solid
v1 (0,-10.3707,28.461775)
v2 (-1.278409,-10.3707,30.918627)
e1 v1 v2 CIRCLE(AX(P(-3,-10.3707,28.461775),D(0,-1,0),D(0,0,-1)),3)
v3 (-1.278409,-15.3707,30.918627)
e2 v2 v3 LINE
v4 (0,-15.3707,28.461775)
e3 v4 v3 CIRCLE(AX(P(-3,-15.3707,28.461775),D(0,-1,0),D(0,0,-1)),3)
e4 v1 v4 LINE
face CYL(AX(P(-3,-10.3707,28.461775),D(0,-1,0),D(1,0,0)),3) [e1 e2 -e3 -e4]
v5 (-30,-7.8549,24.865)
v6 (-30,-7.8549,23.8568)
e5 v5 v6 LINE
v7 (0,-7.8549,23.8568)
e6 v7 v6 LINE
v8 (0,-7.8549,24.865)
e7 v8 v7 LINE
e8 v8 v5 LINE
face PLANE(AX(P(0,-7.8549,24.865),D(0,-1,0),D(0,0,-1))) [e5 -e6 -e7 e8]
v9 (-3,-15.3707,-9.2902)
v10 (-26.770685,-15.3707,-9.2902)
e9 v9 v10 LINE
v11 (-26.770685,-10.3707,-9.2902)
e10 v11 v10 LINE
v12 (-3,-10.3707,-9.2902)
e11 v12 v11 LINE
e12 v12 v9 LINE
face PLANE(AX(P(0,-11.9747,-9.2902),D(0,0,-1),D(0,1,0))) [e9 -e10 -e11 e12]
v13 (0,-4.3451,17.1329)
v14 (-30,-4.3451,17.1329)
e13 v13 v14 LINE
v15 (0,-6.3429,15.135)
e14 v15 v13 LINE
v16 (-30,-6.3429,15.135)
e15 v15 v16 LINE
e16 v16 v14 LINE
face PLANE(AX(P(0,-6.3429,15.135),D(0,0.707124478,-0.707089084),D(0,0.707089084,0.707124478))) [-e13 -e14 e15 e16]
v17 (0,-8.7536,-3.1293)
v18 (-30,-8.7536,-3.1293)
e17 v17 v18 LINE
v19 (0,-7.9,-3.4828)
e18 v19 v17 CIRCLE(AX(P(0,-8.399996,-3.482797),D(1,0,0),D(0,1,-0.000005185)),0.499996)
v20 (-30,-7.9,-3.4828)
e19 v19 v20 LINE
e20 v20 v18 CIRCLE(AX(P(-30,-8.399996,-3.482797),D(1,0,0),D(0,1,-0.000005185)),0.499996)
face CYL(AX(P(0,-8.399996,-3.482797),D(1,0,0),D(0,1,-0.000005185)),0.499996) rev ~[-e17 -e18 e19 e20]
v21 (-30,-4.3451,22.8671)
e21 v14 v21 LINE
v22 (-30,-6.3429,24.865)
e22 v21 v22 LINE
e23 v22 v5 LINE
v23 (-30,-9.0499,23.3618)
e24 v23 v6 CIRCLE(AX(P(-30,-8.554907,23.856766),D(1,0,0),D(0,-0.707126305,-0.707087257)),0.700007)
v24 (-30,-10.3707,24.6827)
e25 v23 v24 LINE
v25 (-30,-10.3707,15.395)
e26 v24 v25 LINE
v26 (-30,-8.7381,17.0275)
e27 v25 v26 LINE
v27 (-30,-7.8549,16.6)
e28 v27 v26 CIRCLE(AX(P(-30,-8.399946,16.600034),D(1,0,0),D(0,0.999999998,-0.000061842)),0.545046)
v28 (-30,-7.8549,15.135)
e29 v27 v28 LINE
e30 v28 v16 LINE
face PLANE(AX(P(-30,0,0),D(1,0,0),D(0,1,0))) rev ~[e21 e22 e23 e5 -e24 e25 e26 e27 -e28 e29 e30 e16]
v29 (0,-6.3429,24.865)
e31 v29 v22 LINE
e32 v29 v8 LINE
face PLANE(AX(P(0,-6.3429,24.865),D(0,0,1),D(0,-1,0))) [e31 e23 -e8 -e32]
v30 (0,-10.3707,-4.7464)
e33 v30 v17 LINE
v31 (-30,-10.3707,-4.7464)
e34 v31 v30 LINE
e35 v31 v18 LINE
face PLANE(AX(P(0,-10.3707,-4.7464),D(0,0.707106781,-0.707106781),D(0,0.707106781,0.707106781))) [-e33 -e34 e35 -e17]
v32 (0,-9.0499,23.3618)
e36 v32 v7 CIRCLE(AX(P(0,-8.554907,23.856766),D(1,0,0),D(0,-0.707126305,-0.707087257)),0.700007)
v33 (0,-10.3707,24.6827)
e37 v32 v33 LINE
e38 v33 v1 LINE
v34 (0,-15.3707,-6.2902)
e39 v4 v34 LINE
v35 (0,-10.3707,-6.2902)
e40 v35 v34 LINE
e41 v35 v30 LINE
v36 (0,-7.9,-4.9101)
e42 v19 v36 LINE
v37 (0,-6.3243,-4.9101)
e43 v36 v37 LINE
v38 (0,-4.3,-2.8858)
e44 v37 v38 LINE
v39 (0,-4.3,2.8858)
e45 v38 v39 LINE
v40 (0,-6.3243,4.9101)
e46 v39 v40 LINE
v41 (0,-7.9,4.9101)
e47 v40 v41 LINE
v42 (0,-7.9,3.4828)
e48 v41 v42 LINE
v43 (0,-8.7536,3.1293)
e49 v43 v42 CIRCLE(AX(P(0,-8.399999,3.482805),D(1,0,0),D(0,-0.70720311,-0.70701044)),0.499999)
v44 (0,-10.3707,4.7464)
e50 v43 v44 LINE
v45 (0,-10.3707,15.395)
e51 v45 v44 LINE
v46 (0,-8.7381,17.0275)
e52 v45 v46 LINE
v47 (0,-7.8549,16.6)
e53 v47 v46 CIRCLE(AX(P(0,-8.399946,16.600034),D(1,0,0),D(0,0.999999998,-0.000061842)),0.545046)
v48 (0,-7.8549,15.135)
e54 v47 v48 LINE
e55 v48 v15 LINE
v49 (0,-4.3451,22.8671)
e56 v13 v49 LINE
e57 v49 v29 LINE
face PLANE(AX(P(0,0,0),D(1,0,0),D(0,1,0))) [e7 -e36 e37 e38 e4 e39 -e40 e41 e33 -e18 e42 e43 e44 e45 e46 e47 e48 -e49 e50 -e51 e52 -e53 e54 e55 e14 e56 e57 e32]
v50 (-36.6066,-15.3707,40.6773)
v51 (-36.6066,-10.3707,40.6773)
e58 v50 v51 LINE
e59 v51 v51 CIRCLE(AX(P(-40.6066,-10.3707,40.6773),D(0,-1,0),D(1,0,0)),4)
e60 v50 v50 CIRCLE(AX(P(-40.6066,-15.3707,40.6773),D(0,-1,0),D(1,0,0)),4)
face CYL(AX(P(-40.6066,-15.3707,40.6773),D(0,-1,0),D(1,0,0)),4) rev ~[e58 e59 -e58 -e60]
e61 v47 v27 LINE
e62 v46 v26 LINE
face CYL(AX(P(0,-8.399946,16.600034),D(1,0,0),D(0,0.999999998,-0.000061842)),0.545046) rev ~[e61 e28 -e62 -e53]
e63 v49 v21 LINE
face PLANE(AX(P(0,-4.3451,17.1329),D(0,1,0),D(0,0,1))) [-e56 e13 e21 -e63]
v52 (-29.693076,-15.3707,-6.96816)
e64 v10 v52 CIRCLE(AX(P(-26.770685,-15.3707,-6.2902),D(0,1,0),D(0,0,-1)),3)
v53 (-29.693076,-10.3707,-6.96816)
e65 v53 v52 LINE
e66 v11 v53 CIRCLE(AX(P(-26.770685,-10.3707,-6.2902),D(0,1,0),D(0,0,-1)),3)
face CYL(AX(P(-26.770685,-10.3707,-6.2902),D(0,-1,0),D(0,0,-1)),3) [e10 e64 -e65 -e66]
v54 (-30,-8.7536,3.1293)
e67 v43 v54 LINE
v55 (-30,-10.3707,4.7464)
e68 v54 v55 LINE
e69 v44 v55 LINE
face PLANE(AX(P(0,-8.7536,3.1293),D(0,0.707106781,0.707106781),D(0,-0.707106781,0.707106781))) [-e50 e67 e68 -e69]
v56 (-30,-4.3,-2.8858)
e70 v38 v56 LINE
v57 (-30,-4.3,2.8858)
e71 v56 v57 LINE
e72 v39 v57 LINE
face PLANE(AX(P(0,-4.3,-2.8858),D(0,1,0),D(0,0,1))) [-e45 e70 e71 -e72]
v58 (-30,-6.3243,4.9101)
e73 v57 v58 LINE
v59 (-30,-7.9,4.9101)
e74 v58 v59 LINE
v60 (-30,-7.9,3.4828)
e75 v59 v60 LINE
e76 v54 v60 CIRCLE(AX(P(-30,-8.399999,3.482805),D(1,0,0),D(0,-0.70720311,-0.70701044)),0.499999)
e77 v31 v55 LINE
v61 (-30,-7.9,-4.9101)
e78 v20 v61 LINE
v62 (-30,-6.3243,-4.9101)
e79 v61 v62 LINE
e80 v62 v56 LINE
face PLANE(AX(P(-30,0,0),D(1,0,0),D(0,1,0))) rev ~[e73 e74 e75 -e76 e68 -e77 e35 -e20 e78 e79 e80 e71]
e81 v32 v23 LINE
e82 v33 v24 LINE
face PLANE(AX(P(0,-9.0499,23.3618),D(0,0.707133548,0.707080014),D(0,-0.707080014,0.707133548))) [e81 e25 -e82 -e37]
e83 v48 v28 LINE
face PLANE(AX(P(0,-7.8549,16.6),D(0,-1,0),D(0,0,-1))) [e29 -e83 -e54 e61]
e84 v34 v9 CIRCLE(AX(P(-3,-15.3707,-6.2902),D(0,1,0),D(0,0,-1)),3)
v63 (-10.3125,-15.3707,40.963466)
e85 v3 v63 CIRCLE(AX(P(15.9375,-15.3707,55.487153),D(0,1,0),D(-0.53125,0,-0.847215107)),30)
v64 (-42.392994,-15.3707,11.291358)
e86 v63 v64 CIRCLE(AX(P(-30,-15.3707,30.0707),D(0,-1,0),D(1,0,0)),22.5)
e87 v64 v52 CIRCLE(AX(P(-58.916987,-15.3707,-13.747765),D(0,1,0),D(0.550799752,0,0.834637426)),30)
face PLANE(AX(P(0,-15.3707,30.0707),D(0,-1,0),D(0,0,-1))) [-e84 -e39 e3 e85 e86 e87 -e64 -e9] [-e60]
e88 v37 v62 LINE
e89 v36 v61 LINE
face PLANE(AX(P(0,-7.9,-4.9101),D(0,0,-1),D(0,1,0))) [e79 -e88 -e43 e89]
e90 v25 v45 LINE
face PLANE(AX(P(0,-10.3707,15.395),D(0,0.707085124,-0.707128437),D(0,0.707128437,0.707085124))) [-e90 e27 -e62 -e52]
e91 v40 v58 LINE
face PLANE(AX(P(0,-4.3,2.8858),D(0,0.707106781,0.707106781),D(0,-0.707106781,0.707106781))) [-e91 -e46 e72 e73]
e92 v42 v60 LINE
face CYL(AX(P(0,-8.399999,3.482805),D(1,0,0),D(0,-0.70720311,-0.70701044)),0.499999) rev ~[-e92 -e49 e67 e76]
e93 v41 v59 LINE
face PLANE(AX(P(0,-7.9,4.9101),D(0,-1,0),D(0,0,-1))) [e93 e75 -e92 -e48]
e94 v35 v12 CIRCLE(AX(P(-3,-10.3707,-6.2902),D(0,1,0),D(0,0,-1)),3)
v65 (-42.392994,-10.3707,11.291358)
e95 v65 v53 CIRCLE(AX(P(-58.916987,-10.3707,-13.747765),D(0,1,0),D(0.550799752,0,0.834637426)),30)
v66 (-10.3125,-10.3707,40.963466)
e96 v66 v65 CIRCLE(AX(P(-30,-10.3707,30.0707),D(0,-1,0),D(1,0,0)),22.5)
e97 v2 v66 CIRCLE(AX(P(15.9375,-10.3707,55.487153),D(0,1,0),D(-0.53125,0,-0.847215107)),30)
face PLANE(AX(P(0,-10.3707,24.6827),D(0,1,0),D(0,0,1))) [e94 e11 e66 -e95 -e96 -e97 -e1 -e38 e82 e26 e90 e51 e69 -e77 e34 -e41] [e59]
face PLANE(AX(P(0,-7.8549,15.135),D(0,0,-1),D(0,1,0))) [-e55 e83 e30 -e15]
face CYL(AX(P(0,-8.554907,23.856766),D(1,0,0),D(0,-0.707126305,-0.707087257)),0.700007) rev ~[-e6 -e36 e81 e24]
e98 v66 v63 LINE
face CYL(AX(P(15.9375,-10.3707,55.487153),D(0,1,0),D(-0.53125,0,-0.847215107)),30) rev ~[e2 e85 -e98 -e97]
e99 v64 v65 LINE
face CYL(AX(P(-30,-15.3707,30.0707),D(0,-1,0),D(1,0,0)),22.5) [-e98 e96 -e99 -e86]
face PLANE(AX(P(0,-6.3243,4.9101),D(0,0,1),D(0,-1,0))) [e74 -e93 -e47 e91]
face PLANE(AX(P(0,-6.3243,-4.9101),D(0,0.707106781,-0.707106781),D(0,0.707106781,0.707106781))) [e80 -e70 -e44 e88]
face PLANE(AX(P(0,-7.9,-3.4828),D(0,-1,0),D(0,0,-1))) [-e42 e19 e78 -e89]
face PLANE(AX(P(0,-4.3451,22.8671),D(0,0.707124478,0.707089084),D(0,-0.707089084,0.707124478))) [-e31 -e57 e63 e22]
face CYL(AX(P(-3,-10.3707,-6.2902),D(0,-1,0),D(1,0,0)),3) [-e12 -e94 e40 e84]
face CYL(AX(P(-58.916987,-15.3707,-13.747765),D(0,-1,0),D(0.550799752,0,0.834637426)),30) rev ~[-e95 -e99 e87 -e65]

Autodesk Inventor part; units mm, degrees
ref_plane "YZ Plane" through (0, 0, 0) normal (1, 0, 0) x (0, 1, 0)
ref_plane "XZ Plane" through (0, 0, 0) normal (0, 1, 0) x (-1, 0, 0)
ref_plane "XY Plane" through (0, 0, 0) normal (0, 0, 1) x (1, 0, 0)
sketch "Sketch1" plane through (0, 0, 0) normal (1, 0, 0) x (0, 1, 0)
  line L0 (-10.3707, -4.7464) -> (-8.7536, -3.1293)
  line L1 (-10.3707, 15.395) -> (-8.7381, 17.0275)
  arc A0 (-7.8549, 16.6) -> (-8.7381, 17.0275) centre (-8.4, 16.6) ccw
  line L2 (-7.8549, 16.6) -> (-7.8549, 15.135)
  line L3 (-7.8549, 15.135) -> (-6.3429, 15.135)
  line L4 (-6.3429, 15.135) -> (-4.3451, 17.1329)
  line L5 (-4.3451, 17.1329) -> (-4.3451, 22.8671)
  line L6 (-4.3451, 22.8671) -> (-6.3429, 24.865)
  line L7 (-6.3429, 24.865) -> (-7.8549, 24.865)
  line L8 (-7.8549, 24.865) -> (-7.8549, 23.8568)
  arc A1 (-9.0499, 23.3618) -> (-7.8549, 23.8568) centre (-8.5549, 23.8568) ccw
  line L9 (-9.0499, 23.3618) -> (-10.3707, 24.6827)
  line L10 (-10.3707, 24.6827) -> (-10.3707, 30.0707)
  line L11 (-10.3707, 30.0707) -> (-11.3707, 30.0707)
  line L12 (-11.9747, -9.2902) -> (-10.3707, -9.2902)
  arc A2 (-7.9, -3.4828) -> (-8.7536, -3.1293) centre (-8.4, -3.4828) ccw
  line L13 (-7.9, -3.4828) -> (-7.9, -4.9101)
  line L14 (-7.9, -4.9101) -> (-6.3243, -4.9101)
  line L15 (-6.3243, -4.9101) -> (-4.3, -2.8858)
  line L16 (-4.3, -2.8858) -> (-4.3, 2.8858)
  line L17 (-4.3, 2.8858) -> (-6.3243, 4.9101)
  line L18 (-6.3243, 4.9101) -> (-7.9, 4.9101)
  line L19 (-7.9, 4.9101) -> (-7.9, 3.4828)
  arc A3 (-8.7536, 3.1293) -> (-7.9, 3.4828) centre (-8.4, 3.4828) ccw
  line L20 (-8.7536, 3.1293) -> (-10.3707, 4.7464)
  line L21 (-10.3707, 15.395) -> (-10.3707, 4.7464)
  line L22 (-10.3707, 30.0707) -> (-15.3707, 30.0707)
  line L23 (-15.3707, 30.0707) -> (-15.3707, -9.2902)
  line L24 (-15.3707, -9.2902) -> (-10.3707, -9.2902)
  line L25 (-10.3707, 24.6827) -> (-10.3707, 30.0707)
  line L26 (-10.3707, -9.2902) -> (-10.3707, -4.7464)
  line L27 (-10.3707, 4.7464) -> (-10.3707, 15.395)
  point P0 (0, 0)
  point P1 (-7.8549, 16.6)
  point P2 (-9.0499, 23.3618)
  dimension "d0" = 5
extrude "Extrusion1" add sketch "Sketch1" against normal blind 30
sketch "Sketch2" plane through (0, -15.3707, -9.2902) normal (0, -1, 0) x (1, 0, 0)
  line L0 (-30, 0) -> (-30, 39.3609) projected
  circle A0 centre (-30, 39.3609) radius 22.5
  circle A1 centre (-40.6066, 49.9675) radius 4
  point P0 (0, 9.2902)
  dimension "d3" = 45
  dimension "d4" = 8
  dimension "d5" = 10.6066
  dimension "d6" = 10.6066
extrude "Extrusion2" add sketch "Sketch2" against normal blind 5
fillet "Fillet1" radius 30 1 edges at (-7.5, -12.8707, 30.0707)
fillet "Fillet2" radius 3 1 edges at (0, -12.8707, 30.0707)
sketch "Sketch3" plane through (-30, 0, 0) normal (-1, 0, 0) x (0, 0, 1)
  line L0 (7.5707, -15.3707) -> (7.5707, -10.3707) projected
  line L1 (-9.2902, -10.3707) -> (-9.2902, -15.3707) projected
  line L2 (7.5707, -15.3707) -> (-9.2902, -15.3707)
  line L3 (-9.2902, -15.3707) -> (-9.2902, -10.3707)
  line L4 (-9.2902, -10.3707) -> (7.5707, -10.3707)
  line L5 (7.5707, -10.3707) -> (7.5707, -15.3707)
  point P0 (0, 0)
extrude "Extrusion3" cut sketch "Sketch3" against normal blind 0.75
fillet "Fillet3" radius 30 1 edges at (-29.25, -12.8707, 7.5707)
fillet "Fillet4" radius 3 1 edges at (0, -12.8707, -9.2902)
fillet "Fillet5" radius 3 1 edges at (-29.25, -12.8707, -9.2902)
equation "\"d6\" = d5"
properties part number "Webcam Mount"
